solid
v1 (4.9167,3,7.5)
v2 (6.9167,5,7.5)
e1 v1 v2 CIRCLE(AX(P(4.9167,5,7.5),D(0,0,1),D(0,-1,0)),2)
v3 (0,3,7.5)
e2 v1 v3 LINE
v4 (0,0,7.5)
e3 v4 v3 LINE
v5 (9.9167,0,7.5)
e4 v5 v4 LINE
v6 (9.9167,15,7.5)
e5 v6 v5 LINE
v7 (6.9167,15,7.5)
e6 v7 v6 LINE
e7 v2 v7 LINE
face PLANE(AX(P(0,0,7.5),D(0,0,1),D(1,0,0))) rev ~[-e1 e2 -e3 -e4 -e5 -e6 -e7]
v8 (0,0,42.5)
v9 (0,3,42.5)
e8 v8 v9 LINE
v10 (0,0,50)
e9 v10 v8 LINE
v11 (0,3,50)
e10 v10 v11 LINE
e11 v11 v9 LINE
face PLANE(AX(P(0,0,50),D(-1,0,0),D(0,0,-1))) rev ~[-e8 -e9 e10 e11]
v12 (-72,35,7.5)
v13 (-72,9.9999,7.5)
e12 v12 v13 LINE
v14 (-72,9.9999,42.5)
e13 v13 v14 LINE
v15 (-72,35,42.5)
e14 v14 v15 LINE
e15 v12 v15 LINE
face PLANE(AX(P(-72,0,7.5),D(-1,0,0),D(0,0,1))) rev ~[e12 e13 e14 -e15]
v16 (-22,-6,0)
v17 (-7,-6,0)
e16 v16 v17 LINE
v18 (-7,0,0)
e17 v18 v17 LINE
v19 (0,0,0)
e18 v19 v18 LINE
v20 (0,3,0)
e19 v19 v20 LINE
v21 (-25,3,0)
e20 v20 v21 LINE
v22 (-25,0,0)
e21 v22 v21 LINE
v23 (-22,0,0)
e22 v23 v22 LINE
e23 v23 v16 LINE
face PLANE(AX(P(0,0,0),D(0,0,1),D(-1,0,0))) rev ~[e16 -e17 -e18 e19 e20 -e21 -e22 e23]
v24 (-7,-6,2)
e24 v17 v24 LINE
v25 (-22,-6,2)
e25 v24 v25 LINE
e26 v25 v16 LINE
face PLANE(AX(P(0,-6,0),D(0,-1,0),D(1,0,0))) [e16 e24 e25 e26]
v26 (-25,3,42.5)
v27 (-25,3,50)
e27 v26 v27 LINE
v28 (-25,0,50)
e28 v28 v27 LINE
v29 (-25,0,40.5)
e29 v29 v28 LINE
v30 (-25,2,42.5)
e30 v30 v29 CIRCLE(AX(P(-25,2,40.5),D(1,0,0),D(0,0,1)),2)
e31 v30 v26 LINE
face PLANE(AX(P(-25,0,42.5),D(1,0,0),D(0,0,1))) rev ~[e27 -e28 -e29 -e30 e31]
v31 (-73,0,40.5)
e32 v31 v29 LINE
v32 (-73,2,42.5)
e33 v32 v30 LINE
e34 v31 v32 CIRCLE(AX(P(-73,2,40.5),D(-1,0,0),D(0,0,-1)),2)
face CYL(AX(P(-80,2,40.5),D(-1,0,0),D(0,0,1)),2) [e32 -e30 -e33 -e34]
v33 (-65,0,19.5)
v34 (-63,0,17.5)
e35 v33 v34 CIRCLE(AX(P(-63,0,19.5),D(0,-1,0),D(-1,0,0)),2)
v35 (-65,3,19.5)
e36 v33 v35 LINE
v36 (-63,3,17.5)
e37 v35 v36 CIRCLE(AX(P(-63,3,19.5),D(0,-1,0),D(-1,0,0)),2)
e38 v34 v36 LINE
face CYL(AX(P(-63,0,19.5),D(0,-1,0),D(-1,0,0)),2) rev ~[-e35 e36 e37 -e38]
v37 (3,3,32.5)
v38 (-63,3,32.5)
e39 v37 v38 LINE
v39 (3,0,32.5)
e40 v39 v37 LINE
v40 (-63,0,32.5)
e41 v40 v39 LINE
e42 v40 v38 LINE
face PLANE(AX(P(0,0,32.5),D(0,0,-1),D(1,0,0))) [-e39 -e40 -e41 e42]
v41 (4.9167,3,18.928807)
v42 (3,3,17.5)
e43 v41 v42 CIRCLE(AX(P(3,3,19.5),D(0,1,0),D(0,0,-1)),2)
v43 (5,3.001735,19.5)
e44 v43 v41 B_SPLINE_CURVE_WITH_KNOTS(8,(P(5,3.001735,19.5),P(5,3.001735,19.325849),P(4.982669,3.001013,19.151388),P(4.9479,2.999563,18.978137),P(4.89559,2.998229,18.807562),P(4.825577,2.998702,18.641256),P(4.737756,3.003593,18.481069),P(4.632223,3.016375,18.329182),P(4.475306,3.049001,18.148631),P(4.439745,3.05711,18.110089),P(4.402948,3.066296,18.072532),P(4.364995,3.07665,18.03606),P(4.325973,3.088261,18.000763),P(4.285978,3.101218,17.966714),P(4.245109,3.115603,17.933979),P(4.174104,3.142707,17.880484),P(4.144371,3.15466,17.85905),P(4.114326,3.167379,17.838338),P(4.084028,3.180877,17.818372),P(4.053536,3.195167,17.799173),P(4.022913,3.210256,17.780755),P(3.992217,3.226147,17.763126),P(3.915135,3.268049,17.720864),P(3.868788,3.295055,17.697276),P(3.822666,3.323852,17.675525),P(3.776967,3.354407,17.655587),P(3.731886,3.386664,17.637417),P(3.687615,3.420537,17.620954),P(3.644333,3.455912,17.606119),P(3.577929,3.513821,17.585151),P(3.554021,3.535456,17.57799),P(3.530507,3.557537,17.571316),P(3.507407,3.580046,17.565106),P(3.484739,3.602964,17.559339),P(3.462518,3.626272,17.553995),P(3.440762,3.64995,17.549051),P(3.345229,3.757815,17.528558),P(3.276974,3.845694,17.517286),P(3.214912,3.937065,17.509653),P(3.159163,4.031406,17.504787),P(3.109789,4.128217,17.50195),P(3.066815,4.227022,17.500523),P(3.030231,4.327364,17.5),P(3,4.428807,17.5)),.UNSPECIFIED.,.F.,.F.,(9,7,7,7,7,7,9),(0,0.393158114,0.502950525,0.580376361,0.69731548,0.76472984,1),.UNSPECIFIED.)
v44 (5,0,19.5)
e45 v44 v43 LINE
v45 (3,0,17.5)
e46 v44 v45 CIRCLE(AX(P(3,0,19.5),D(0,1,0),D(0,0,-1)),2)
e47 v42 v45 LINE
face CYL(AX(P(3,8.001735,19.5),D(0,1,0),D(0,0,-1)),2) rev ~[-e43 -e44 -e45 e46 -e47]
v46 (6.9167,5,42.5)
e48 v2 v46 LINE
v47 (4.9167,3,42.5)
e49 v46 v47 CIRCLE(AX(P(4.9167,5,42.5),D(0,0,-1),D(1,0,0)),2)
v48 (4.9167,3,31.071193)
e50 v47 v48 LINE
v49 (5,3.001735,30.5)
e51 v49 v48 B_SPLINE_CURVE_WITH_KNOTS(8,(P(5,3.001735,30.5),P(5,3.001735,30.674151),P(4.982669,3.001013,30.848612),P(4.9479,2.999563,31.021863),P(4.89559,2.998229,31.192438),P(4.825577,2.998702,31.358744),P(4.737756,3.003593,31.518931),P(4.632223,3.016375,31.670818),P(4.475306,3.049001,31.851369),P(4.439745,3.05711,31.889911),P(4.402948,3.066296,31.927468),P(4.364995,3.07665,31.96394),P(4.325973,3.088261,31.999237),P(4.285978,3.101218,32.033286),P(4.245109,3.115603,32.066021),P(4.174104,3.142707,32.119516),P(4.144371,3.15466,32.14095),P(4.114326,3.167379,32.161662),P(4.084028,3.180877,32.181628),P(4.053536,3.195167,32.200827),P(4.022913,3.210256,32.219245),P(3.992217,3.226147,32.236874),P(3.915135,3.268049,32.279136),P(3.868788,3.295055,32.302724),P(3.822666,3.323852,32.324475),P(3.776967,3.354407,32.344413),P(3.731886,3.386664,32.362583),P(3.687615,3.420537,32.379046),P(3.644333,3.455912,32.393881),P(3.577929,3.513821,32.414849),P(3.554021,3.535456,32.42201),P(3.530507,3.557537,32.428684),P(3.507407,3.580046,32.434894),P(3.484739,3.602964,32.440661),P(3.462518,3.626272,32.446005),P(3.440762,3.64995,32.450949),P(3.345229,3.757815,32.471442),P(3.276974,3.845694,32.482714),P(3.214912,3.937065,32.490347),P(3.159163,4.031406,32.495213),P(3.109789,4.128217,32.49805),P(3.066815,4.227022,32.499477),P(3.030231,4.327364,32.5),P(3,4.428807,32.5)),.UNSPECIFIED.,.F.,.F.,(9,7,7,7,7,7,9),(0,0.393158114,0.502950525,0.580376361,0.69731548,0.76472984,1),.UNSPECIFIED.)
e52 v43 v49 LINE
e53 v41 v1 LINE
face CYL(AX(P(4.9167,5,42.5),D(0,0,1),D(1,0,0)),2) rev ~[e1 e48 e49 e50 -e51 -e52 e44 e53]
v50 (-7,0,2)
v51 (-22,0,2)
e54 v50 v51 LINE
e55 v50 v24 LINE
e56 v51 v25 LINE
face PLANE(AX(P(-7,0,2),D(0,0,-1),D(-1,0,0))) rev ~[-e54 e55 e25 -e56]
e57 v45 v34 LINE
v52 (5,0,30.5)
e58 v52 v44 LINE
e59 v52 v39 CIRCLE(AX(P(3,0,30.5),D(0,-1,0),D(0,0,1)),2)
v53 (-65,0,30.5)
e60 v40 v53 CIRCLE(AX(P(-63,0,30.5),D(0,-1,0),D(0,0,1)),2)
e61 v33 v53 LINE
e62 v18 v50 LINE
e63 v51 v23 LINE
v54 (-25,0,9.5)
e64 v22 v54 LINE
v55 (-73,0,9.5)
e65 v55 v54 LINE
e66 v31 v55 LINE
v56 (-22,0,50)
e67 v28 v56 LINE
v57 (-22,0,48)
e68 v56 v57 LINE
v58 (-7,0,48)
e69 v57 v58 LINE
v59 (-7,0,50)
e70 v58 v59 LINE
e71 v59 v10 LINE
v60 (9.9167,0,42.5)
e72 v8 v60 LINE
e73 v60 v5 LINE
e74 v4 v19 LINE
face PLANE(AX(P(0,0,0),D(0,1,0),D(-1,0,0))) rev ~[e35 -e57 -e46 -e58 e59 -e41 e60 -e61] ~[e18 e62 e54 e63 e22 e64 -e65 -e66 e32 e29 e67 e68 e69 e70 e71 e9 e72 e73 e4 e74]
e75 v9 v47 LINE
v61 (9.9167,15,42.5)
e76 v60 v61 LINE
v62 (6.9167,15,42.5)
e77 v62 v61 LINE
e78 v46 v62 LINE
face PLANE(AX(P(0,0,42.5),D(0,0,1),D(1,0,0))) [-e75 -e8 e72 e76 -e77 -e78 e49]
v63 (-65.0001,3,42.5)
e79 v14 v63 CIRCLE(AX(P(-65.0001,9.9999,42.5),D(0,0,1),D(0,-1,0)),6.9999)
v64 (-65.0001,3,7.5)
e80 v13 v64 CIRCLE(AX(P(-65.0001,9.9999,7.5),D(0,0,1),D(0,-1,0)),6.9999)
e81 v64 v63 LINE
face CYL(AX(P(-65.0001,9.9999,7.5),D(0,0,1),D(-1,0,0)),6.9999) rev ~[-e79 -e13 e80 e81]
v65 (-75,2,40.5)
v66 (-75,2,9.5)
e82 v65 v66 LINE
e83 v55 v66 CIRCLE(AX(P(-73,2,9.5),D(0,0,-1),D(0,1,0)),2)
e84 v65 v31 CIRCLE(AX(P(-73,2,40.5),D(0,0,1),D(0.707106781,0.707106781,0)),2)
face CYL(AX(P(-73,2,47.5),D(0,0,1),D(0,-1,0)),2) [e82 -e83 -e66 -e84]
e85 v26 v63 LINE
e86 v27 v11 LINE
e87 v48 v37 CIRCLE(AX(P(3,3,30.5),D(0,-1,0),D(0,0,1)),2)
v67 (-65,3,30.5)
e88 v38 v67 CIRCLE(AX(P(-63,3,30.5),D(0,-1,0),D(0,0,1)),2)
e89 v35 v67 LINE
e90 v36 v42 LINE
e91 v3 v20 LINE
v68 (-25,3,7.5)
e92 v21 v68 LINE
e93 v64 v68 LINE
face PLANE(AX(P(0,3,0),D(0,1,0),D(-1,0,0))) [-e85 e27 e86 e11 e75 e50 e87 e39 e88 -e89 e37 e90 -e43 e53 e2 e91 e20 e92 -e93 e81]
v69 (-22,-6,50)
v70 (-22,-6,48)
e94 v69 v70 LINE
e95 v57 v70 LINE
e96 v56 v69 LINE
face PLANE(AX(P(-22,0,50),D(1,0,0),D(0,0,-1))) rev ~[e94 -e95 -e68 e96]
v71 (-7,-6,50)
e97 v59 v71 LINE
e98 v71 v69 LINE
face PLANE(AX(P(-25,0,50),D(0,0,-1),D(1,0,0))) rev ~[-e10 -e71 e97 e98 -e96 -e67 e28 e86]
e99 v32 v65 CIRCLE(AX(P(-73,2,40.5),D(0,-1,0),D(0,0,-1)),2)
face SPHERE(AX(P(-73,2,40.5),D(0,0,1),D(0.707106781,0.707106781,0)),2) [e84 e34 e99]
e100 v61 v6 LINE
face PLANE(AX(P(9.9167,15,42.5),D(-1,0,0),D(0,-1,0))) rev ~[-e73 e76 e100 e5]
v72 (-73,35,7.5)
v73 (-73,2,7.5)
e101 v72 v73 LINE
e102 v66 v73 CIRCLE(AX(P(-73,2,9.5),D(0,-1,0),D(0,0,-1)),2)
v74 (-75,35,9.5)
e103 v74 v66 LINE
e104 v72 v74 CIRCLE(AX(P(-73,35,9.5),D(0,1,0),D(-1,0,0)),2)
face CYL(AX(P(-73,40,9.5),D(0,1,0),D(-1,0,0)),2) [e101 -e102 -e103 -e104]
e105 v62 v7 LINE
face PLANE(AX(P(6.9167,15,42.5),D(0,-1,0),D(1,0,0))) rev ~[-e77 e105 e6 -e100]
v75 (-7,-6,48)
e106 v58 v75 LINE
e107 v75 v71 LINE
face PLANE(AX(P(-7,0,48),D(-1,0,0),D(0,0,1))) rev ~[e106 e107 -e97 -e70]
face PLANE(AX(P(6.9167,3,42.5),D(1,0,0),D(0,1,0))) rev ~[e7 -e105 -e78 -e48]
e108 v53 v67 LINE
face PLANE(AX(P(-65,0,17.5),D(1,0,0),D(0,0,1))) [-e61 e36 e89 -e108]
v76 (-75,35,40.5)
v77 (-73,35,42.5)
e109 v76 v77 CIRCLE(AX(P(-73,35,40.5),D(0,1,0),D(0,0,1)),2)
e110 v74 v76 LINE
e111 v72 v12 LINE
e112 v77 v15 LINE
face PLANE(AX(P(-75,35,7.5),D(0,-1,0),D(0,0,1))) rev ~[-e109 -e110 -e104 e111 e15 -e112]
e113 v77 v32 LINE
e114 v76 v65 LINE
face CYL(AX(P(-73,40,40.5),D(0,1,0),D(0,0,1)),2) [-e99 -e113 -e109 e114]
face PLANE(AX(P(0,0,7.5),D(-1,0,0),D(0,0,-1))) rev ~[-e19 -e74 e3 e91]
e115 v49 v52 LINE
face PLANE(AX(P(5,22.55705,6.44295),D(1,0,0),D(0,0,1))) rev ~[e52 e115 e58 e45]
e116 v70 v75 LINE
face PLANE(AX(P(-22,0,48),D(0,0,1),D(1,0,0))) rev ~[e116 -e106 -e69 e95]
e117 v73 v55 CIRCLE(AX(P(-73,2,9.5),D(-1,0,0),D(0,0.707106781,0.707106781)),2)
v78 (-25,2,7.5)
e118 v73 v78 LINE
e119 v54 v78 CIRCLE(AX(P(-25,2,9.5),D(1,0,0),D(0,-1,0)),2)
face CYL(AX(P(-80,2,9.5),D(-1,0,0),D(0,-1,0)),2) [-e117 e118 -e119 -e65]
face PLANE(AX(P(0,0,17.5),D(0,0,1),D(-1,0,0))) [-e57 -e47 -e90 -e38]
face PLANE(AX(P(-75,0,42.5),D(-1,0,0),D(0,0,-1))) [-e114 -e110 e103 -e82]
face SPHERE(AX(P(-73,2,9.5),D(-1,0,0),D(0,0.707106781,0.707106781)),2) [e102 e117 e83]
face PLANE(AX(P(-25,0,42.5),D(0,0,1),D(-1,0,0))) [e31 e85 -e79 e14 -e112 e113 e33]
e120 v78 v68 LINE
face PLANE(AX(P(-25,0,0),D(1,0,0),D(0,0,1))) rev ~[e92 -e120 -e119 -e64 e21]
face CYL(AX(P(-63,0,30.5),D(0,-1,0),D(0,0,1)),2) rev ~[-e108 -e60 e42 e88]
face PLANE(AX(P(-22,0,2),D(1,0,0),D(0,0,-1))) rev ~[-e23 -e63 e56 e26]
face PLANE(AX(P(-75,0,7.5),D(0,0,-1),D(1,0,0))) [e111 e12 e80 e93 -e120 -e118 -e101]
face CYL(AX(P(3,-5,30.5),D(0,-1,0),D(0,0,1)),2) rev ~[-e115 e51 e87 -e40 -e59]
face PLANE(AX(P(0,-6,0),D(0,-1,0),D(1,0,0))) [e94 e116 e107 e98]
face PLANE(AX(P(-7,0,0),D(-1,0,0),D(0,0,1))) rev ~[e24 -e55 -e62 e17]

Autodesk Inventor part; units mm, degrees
ref_plane "YZ Plane" through (0, 0, 0) normal (1, 0, 0) x (0, 1, 0)
ref_plane "XZ Plane" through (0, 0, 0) normal (0, 1, 0) x (-1, 0, 0)
ref_plane "XY Plane" through (0, 0, 0) normal (0, 0, 1) x (1, 0, 0)
sketch "Skizze1" plane through (0, 0, 0) normal (0, 1, 0) x (-1, 0, 0)
  line L0 (0, 0) -> (25, 0)
  line L1 (25, 50) -> (0, 50)
  line L2 (0, 42.5) -> (-9.9167, 42.5)
  line L3 (-9.9167, 42.5) -> (-9.9167, 7.5)
  line L4 (-9.9167, 7.5) -> (0, 7.5)
  line L5 (65, 32.5) -> (-5, 32.5)
  line L6 (-5, 32.5) -> (-5, 17.5)
  line L7 (-5, 17.5) -> (65, 17.5)
  line L8 (65, 17.5) -> (65, 32.5)
  line L9 (0, 7.5) -> (0, 17.5)
  line L10 (0, 32.5) -> (0, 42.5)
  line L11 (0, 50) -> (0, 32.5)
  line L12 (0, 17.5) -> (0, 0)
  line L13 (25, 42.5) -> (75, 42.5)
  line L14 (75, 42.5) -> (75, 7.5)
  line L15 (75, 7.5) -> (25, 7.5)
  line L16 (25, 0) -> (25, 17.5)
  line L17 (25, 32.5) -> (25, 50)
  dimension "d0" = 50
  dimension "d1" = 25
  dimension "d2" = 7.5
  dimension "d4" = 35
  dimension "d5" = 10
  dimension "d6" = 15
  dimension "d8" = 70
  dimension "d9" = 65
  dimension "d26" = 50
  dimension "d27" = 35
  dimension "d28" = 7.5
extrude "Extrusion1" add sketch "Skizze1" along normal blind 3 contours L12 L9 L7 L16 L0 | L4 L3 L2 L10 L5 L6 L7 L9 | L16 L7 L8 L5 L17 L13 L14 L15 | L11 L1 L17 L5 L10
sketch "Skizze2" plane through (0, 0, 42.5) normal (0, 0, 1) x (1, 0, 0)
  line L0 (9.9167, 0) -> (9.9167, 3) projected
  line L1 (9.9167, 3) -> (6.9167, 3)
  line L2 (6.9167, 3) -> (6.9167, 15)
  line L3 (6.9167, 15) -> (9.9167, 15)
  line L4 (9.9167, 15) -> (9.9167, 3)
  point P0 (0, 0)
  dimension "d12" = 3
  dimension "d13" = 12
extrude "Extrusion2" add sketch "Skizze2" against normal up to surface (35 mm away)
fillet "Rundung1" radius 2 1 edges at (6.9167, 3, 25)
sketch "Skizze3" plane through (0, 0, 0) normal (0, -1, 0) x (1, 0, 0)
  line L0 (-22, 0) -> (-7, 0)
  line L1 (-7, 0) -> (-7, 2)
  line L2 (-7, 2) -> (-22, 2)
  line L3 (-22, 2) -> (-22, 0)
  line L4 (-22, 48) -> (-7, 48)
  line L5 (-7, 48) -> (-7, 50)
  line L6 (-7, 50) -> (-22, 50)
  line L7 (-22, 50) -> (-22, 48)
  line L8 (-25, 50) -> (0, 50) projected
  line L9 (0, 50) -> (0, 42.5) projected
  point P0 (0, 0)
  point P1 (0, 32.5)
  dimension "d17" = 2
  dimension "d18" = 2
  dimension "d19" = 46
  dimension "d20" = 15
  dimension "d21" = 15
  dimension "d22" = 0
  dimension "d23" = 7
extrude "Extrusion3" add sketch "Skizze3" along normal blind 6
sketch "Skizze4" plane through (-75, 0, 7.5) normal (-1, 0, 0) x (0, 0, 1)
  line L0 (0, 0) -> (0, 35)
  line L1 (0, 35) -> (35, 35)
  line L2 (35, 0) -> (35, 15) projected
  line L3 (35, 35) -> (35, 0)
  line L4 (0, 0) -> (0, 15) projected
  line L5 (35, 0) -> (0, 0)
  point P0 (-7.5, 0)
  dimension "d29" = 35
extrude "Extrusion4" add sketch "Skizze4" against normal blind 3
fillet "Rundung2" radius 7 1 edges at (-72, 3, 25)
fillet "Rundung3" radius 2 7 edges at (-50, 0, 42.5) (-75, 0, 25) (-50, 0, 7.5) (-65, 1.5, 17.5) (-65, 1.5, 32.5) (5, 1.5009, 32.5) (5, 1.5009, 17.5)
fillet "Rundung4" radius 2 4 edges at (-74.4142, 0.5858, 41.9142) (-75, 18.5, 42.5) (-74.4142, 0.5858, 8.0858) (-75, 18.5, 7.5)
properties part number "Ultrasonic" material "Stahl, Guss"
